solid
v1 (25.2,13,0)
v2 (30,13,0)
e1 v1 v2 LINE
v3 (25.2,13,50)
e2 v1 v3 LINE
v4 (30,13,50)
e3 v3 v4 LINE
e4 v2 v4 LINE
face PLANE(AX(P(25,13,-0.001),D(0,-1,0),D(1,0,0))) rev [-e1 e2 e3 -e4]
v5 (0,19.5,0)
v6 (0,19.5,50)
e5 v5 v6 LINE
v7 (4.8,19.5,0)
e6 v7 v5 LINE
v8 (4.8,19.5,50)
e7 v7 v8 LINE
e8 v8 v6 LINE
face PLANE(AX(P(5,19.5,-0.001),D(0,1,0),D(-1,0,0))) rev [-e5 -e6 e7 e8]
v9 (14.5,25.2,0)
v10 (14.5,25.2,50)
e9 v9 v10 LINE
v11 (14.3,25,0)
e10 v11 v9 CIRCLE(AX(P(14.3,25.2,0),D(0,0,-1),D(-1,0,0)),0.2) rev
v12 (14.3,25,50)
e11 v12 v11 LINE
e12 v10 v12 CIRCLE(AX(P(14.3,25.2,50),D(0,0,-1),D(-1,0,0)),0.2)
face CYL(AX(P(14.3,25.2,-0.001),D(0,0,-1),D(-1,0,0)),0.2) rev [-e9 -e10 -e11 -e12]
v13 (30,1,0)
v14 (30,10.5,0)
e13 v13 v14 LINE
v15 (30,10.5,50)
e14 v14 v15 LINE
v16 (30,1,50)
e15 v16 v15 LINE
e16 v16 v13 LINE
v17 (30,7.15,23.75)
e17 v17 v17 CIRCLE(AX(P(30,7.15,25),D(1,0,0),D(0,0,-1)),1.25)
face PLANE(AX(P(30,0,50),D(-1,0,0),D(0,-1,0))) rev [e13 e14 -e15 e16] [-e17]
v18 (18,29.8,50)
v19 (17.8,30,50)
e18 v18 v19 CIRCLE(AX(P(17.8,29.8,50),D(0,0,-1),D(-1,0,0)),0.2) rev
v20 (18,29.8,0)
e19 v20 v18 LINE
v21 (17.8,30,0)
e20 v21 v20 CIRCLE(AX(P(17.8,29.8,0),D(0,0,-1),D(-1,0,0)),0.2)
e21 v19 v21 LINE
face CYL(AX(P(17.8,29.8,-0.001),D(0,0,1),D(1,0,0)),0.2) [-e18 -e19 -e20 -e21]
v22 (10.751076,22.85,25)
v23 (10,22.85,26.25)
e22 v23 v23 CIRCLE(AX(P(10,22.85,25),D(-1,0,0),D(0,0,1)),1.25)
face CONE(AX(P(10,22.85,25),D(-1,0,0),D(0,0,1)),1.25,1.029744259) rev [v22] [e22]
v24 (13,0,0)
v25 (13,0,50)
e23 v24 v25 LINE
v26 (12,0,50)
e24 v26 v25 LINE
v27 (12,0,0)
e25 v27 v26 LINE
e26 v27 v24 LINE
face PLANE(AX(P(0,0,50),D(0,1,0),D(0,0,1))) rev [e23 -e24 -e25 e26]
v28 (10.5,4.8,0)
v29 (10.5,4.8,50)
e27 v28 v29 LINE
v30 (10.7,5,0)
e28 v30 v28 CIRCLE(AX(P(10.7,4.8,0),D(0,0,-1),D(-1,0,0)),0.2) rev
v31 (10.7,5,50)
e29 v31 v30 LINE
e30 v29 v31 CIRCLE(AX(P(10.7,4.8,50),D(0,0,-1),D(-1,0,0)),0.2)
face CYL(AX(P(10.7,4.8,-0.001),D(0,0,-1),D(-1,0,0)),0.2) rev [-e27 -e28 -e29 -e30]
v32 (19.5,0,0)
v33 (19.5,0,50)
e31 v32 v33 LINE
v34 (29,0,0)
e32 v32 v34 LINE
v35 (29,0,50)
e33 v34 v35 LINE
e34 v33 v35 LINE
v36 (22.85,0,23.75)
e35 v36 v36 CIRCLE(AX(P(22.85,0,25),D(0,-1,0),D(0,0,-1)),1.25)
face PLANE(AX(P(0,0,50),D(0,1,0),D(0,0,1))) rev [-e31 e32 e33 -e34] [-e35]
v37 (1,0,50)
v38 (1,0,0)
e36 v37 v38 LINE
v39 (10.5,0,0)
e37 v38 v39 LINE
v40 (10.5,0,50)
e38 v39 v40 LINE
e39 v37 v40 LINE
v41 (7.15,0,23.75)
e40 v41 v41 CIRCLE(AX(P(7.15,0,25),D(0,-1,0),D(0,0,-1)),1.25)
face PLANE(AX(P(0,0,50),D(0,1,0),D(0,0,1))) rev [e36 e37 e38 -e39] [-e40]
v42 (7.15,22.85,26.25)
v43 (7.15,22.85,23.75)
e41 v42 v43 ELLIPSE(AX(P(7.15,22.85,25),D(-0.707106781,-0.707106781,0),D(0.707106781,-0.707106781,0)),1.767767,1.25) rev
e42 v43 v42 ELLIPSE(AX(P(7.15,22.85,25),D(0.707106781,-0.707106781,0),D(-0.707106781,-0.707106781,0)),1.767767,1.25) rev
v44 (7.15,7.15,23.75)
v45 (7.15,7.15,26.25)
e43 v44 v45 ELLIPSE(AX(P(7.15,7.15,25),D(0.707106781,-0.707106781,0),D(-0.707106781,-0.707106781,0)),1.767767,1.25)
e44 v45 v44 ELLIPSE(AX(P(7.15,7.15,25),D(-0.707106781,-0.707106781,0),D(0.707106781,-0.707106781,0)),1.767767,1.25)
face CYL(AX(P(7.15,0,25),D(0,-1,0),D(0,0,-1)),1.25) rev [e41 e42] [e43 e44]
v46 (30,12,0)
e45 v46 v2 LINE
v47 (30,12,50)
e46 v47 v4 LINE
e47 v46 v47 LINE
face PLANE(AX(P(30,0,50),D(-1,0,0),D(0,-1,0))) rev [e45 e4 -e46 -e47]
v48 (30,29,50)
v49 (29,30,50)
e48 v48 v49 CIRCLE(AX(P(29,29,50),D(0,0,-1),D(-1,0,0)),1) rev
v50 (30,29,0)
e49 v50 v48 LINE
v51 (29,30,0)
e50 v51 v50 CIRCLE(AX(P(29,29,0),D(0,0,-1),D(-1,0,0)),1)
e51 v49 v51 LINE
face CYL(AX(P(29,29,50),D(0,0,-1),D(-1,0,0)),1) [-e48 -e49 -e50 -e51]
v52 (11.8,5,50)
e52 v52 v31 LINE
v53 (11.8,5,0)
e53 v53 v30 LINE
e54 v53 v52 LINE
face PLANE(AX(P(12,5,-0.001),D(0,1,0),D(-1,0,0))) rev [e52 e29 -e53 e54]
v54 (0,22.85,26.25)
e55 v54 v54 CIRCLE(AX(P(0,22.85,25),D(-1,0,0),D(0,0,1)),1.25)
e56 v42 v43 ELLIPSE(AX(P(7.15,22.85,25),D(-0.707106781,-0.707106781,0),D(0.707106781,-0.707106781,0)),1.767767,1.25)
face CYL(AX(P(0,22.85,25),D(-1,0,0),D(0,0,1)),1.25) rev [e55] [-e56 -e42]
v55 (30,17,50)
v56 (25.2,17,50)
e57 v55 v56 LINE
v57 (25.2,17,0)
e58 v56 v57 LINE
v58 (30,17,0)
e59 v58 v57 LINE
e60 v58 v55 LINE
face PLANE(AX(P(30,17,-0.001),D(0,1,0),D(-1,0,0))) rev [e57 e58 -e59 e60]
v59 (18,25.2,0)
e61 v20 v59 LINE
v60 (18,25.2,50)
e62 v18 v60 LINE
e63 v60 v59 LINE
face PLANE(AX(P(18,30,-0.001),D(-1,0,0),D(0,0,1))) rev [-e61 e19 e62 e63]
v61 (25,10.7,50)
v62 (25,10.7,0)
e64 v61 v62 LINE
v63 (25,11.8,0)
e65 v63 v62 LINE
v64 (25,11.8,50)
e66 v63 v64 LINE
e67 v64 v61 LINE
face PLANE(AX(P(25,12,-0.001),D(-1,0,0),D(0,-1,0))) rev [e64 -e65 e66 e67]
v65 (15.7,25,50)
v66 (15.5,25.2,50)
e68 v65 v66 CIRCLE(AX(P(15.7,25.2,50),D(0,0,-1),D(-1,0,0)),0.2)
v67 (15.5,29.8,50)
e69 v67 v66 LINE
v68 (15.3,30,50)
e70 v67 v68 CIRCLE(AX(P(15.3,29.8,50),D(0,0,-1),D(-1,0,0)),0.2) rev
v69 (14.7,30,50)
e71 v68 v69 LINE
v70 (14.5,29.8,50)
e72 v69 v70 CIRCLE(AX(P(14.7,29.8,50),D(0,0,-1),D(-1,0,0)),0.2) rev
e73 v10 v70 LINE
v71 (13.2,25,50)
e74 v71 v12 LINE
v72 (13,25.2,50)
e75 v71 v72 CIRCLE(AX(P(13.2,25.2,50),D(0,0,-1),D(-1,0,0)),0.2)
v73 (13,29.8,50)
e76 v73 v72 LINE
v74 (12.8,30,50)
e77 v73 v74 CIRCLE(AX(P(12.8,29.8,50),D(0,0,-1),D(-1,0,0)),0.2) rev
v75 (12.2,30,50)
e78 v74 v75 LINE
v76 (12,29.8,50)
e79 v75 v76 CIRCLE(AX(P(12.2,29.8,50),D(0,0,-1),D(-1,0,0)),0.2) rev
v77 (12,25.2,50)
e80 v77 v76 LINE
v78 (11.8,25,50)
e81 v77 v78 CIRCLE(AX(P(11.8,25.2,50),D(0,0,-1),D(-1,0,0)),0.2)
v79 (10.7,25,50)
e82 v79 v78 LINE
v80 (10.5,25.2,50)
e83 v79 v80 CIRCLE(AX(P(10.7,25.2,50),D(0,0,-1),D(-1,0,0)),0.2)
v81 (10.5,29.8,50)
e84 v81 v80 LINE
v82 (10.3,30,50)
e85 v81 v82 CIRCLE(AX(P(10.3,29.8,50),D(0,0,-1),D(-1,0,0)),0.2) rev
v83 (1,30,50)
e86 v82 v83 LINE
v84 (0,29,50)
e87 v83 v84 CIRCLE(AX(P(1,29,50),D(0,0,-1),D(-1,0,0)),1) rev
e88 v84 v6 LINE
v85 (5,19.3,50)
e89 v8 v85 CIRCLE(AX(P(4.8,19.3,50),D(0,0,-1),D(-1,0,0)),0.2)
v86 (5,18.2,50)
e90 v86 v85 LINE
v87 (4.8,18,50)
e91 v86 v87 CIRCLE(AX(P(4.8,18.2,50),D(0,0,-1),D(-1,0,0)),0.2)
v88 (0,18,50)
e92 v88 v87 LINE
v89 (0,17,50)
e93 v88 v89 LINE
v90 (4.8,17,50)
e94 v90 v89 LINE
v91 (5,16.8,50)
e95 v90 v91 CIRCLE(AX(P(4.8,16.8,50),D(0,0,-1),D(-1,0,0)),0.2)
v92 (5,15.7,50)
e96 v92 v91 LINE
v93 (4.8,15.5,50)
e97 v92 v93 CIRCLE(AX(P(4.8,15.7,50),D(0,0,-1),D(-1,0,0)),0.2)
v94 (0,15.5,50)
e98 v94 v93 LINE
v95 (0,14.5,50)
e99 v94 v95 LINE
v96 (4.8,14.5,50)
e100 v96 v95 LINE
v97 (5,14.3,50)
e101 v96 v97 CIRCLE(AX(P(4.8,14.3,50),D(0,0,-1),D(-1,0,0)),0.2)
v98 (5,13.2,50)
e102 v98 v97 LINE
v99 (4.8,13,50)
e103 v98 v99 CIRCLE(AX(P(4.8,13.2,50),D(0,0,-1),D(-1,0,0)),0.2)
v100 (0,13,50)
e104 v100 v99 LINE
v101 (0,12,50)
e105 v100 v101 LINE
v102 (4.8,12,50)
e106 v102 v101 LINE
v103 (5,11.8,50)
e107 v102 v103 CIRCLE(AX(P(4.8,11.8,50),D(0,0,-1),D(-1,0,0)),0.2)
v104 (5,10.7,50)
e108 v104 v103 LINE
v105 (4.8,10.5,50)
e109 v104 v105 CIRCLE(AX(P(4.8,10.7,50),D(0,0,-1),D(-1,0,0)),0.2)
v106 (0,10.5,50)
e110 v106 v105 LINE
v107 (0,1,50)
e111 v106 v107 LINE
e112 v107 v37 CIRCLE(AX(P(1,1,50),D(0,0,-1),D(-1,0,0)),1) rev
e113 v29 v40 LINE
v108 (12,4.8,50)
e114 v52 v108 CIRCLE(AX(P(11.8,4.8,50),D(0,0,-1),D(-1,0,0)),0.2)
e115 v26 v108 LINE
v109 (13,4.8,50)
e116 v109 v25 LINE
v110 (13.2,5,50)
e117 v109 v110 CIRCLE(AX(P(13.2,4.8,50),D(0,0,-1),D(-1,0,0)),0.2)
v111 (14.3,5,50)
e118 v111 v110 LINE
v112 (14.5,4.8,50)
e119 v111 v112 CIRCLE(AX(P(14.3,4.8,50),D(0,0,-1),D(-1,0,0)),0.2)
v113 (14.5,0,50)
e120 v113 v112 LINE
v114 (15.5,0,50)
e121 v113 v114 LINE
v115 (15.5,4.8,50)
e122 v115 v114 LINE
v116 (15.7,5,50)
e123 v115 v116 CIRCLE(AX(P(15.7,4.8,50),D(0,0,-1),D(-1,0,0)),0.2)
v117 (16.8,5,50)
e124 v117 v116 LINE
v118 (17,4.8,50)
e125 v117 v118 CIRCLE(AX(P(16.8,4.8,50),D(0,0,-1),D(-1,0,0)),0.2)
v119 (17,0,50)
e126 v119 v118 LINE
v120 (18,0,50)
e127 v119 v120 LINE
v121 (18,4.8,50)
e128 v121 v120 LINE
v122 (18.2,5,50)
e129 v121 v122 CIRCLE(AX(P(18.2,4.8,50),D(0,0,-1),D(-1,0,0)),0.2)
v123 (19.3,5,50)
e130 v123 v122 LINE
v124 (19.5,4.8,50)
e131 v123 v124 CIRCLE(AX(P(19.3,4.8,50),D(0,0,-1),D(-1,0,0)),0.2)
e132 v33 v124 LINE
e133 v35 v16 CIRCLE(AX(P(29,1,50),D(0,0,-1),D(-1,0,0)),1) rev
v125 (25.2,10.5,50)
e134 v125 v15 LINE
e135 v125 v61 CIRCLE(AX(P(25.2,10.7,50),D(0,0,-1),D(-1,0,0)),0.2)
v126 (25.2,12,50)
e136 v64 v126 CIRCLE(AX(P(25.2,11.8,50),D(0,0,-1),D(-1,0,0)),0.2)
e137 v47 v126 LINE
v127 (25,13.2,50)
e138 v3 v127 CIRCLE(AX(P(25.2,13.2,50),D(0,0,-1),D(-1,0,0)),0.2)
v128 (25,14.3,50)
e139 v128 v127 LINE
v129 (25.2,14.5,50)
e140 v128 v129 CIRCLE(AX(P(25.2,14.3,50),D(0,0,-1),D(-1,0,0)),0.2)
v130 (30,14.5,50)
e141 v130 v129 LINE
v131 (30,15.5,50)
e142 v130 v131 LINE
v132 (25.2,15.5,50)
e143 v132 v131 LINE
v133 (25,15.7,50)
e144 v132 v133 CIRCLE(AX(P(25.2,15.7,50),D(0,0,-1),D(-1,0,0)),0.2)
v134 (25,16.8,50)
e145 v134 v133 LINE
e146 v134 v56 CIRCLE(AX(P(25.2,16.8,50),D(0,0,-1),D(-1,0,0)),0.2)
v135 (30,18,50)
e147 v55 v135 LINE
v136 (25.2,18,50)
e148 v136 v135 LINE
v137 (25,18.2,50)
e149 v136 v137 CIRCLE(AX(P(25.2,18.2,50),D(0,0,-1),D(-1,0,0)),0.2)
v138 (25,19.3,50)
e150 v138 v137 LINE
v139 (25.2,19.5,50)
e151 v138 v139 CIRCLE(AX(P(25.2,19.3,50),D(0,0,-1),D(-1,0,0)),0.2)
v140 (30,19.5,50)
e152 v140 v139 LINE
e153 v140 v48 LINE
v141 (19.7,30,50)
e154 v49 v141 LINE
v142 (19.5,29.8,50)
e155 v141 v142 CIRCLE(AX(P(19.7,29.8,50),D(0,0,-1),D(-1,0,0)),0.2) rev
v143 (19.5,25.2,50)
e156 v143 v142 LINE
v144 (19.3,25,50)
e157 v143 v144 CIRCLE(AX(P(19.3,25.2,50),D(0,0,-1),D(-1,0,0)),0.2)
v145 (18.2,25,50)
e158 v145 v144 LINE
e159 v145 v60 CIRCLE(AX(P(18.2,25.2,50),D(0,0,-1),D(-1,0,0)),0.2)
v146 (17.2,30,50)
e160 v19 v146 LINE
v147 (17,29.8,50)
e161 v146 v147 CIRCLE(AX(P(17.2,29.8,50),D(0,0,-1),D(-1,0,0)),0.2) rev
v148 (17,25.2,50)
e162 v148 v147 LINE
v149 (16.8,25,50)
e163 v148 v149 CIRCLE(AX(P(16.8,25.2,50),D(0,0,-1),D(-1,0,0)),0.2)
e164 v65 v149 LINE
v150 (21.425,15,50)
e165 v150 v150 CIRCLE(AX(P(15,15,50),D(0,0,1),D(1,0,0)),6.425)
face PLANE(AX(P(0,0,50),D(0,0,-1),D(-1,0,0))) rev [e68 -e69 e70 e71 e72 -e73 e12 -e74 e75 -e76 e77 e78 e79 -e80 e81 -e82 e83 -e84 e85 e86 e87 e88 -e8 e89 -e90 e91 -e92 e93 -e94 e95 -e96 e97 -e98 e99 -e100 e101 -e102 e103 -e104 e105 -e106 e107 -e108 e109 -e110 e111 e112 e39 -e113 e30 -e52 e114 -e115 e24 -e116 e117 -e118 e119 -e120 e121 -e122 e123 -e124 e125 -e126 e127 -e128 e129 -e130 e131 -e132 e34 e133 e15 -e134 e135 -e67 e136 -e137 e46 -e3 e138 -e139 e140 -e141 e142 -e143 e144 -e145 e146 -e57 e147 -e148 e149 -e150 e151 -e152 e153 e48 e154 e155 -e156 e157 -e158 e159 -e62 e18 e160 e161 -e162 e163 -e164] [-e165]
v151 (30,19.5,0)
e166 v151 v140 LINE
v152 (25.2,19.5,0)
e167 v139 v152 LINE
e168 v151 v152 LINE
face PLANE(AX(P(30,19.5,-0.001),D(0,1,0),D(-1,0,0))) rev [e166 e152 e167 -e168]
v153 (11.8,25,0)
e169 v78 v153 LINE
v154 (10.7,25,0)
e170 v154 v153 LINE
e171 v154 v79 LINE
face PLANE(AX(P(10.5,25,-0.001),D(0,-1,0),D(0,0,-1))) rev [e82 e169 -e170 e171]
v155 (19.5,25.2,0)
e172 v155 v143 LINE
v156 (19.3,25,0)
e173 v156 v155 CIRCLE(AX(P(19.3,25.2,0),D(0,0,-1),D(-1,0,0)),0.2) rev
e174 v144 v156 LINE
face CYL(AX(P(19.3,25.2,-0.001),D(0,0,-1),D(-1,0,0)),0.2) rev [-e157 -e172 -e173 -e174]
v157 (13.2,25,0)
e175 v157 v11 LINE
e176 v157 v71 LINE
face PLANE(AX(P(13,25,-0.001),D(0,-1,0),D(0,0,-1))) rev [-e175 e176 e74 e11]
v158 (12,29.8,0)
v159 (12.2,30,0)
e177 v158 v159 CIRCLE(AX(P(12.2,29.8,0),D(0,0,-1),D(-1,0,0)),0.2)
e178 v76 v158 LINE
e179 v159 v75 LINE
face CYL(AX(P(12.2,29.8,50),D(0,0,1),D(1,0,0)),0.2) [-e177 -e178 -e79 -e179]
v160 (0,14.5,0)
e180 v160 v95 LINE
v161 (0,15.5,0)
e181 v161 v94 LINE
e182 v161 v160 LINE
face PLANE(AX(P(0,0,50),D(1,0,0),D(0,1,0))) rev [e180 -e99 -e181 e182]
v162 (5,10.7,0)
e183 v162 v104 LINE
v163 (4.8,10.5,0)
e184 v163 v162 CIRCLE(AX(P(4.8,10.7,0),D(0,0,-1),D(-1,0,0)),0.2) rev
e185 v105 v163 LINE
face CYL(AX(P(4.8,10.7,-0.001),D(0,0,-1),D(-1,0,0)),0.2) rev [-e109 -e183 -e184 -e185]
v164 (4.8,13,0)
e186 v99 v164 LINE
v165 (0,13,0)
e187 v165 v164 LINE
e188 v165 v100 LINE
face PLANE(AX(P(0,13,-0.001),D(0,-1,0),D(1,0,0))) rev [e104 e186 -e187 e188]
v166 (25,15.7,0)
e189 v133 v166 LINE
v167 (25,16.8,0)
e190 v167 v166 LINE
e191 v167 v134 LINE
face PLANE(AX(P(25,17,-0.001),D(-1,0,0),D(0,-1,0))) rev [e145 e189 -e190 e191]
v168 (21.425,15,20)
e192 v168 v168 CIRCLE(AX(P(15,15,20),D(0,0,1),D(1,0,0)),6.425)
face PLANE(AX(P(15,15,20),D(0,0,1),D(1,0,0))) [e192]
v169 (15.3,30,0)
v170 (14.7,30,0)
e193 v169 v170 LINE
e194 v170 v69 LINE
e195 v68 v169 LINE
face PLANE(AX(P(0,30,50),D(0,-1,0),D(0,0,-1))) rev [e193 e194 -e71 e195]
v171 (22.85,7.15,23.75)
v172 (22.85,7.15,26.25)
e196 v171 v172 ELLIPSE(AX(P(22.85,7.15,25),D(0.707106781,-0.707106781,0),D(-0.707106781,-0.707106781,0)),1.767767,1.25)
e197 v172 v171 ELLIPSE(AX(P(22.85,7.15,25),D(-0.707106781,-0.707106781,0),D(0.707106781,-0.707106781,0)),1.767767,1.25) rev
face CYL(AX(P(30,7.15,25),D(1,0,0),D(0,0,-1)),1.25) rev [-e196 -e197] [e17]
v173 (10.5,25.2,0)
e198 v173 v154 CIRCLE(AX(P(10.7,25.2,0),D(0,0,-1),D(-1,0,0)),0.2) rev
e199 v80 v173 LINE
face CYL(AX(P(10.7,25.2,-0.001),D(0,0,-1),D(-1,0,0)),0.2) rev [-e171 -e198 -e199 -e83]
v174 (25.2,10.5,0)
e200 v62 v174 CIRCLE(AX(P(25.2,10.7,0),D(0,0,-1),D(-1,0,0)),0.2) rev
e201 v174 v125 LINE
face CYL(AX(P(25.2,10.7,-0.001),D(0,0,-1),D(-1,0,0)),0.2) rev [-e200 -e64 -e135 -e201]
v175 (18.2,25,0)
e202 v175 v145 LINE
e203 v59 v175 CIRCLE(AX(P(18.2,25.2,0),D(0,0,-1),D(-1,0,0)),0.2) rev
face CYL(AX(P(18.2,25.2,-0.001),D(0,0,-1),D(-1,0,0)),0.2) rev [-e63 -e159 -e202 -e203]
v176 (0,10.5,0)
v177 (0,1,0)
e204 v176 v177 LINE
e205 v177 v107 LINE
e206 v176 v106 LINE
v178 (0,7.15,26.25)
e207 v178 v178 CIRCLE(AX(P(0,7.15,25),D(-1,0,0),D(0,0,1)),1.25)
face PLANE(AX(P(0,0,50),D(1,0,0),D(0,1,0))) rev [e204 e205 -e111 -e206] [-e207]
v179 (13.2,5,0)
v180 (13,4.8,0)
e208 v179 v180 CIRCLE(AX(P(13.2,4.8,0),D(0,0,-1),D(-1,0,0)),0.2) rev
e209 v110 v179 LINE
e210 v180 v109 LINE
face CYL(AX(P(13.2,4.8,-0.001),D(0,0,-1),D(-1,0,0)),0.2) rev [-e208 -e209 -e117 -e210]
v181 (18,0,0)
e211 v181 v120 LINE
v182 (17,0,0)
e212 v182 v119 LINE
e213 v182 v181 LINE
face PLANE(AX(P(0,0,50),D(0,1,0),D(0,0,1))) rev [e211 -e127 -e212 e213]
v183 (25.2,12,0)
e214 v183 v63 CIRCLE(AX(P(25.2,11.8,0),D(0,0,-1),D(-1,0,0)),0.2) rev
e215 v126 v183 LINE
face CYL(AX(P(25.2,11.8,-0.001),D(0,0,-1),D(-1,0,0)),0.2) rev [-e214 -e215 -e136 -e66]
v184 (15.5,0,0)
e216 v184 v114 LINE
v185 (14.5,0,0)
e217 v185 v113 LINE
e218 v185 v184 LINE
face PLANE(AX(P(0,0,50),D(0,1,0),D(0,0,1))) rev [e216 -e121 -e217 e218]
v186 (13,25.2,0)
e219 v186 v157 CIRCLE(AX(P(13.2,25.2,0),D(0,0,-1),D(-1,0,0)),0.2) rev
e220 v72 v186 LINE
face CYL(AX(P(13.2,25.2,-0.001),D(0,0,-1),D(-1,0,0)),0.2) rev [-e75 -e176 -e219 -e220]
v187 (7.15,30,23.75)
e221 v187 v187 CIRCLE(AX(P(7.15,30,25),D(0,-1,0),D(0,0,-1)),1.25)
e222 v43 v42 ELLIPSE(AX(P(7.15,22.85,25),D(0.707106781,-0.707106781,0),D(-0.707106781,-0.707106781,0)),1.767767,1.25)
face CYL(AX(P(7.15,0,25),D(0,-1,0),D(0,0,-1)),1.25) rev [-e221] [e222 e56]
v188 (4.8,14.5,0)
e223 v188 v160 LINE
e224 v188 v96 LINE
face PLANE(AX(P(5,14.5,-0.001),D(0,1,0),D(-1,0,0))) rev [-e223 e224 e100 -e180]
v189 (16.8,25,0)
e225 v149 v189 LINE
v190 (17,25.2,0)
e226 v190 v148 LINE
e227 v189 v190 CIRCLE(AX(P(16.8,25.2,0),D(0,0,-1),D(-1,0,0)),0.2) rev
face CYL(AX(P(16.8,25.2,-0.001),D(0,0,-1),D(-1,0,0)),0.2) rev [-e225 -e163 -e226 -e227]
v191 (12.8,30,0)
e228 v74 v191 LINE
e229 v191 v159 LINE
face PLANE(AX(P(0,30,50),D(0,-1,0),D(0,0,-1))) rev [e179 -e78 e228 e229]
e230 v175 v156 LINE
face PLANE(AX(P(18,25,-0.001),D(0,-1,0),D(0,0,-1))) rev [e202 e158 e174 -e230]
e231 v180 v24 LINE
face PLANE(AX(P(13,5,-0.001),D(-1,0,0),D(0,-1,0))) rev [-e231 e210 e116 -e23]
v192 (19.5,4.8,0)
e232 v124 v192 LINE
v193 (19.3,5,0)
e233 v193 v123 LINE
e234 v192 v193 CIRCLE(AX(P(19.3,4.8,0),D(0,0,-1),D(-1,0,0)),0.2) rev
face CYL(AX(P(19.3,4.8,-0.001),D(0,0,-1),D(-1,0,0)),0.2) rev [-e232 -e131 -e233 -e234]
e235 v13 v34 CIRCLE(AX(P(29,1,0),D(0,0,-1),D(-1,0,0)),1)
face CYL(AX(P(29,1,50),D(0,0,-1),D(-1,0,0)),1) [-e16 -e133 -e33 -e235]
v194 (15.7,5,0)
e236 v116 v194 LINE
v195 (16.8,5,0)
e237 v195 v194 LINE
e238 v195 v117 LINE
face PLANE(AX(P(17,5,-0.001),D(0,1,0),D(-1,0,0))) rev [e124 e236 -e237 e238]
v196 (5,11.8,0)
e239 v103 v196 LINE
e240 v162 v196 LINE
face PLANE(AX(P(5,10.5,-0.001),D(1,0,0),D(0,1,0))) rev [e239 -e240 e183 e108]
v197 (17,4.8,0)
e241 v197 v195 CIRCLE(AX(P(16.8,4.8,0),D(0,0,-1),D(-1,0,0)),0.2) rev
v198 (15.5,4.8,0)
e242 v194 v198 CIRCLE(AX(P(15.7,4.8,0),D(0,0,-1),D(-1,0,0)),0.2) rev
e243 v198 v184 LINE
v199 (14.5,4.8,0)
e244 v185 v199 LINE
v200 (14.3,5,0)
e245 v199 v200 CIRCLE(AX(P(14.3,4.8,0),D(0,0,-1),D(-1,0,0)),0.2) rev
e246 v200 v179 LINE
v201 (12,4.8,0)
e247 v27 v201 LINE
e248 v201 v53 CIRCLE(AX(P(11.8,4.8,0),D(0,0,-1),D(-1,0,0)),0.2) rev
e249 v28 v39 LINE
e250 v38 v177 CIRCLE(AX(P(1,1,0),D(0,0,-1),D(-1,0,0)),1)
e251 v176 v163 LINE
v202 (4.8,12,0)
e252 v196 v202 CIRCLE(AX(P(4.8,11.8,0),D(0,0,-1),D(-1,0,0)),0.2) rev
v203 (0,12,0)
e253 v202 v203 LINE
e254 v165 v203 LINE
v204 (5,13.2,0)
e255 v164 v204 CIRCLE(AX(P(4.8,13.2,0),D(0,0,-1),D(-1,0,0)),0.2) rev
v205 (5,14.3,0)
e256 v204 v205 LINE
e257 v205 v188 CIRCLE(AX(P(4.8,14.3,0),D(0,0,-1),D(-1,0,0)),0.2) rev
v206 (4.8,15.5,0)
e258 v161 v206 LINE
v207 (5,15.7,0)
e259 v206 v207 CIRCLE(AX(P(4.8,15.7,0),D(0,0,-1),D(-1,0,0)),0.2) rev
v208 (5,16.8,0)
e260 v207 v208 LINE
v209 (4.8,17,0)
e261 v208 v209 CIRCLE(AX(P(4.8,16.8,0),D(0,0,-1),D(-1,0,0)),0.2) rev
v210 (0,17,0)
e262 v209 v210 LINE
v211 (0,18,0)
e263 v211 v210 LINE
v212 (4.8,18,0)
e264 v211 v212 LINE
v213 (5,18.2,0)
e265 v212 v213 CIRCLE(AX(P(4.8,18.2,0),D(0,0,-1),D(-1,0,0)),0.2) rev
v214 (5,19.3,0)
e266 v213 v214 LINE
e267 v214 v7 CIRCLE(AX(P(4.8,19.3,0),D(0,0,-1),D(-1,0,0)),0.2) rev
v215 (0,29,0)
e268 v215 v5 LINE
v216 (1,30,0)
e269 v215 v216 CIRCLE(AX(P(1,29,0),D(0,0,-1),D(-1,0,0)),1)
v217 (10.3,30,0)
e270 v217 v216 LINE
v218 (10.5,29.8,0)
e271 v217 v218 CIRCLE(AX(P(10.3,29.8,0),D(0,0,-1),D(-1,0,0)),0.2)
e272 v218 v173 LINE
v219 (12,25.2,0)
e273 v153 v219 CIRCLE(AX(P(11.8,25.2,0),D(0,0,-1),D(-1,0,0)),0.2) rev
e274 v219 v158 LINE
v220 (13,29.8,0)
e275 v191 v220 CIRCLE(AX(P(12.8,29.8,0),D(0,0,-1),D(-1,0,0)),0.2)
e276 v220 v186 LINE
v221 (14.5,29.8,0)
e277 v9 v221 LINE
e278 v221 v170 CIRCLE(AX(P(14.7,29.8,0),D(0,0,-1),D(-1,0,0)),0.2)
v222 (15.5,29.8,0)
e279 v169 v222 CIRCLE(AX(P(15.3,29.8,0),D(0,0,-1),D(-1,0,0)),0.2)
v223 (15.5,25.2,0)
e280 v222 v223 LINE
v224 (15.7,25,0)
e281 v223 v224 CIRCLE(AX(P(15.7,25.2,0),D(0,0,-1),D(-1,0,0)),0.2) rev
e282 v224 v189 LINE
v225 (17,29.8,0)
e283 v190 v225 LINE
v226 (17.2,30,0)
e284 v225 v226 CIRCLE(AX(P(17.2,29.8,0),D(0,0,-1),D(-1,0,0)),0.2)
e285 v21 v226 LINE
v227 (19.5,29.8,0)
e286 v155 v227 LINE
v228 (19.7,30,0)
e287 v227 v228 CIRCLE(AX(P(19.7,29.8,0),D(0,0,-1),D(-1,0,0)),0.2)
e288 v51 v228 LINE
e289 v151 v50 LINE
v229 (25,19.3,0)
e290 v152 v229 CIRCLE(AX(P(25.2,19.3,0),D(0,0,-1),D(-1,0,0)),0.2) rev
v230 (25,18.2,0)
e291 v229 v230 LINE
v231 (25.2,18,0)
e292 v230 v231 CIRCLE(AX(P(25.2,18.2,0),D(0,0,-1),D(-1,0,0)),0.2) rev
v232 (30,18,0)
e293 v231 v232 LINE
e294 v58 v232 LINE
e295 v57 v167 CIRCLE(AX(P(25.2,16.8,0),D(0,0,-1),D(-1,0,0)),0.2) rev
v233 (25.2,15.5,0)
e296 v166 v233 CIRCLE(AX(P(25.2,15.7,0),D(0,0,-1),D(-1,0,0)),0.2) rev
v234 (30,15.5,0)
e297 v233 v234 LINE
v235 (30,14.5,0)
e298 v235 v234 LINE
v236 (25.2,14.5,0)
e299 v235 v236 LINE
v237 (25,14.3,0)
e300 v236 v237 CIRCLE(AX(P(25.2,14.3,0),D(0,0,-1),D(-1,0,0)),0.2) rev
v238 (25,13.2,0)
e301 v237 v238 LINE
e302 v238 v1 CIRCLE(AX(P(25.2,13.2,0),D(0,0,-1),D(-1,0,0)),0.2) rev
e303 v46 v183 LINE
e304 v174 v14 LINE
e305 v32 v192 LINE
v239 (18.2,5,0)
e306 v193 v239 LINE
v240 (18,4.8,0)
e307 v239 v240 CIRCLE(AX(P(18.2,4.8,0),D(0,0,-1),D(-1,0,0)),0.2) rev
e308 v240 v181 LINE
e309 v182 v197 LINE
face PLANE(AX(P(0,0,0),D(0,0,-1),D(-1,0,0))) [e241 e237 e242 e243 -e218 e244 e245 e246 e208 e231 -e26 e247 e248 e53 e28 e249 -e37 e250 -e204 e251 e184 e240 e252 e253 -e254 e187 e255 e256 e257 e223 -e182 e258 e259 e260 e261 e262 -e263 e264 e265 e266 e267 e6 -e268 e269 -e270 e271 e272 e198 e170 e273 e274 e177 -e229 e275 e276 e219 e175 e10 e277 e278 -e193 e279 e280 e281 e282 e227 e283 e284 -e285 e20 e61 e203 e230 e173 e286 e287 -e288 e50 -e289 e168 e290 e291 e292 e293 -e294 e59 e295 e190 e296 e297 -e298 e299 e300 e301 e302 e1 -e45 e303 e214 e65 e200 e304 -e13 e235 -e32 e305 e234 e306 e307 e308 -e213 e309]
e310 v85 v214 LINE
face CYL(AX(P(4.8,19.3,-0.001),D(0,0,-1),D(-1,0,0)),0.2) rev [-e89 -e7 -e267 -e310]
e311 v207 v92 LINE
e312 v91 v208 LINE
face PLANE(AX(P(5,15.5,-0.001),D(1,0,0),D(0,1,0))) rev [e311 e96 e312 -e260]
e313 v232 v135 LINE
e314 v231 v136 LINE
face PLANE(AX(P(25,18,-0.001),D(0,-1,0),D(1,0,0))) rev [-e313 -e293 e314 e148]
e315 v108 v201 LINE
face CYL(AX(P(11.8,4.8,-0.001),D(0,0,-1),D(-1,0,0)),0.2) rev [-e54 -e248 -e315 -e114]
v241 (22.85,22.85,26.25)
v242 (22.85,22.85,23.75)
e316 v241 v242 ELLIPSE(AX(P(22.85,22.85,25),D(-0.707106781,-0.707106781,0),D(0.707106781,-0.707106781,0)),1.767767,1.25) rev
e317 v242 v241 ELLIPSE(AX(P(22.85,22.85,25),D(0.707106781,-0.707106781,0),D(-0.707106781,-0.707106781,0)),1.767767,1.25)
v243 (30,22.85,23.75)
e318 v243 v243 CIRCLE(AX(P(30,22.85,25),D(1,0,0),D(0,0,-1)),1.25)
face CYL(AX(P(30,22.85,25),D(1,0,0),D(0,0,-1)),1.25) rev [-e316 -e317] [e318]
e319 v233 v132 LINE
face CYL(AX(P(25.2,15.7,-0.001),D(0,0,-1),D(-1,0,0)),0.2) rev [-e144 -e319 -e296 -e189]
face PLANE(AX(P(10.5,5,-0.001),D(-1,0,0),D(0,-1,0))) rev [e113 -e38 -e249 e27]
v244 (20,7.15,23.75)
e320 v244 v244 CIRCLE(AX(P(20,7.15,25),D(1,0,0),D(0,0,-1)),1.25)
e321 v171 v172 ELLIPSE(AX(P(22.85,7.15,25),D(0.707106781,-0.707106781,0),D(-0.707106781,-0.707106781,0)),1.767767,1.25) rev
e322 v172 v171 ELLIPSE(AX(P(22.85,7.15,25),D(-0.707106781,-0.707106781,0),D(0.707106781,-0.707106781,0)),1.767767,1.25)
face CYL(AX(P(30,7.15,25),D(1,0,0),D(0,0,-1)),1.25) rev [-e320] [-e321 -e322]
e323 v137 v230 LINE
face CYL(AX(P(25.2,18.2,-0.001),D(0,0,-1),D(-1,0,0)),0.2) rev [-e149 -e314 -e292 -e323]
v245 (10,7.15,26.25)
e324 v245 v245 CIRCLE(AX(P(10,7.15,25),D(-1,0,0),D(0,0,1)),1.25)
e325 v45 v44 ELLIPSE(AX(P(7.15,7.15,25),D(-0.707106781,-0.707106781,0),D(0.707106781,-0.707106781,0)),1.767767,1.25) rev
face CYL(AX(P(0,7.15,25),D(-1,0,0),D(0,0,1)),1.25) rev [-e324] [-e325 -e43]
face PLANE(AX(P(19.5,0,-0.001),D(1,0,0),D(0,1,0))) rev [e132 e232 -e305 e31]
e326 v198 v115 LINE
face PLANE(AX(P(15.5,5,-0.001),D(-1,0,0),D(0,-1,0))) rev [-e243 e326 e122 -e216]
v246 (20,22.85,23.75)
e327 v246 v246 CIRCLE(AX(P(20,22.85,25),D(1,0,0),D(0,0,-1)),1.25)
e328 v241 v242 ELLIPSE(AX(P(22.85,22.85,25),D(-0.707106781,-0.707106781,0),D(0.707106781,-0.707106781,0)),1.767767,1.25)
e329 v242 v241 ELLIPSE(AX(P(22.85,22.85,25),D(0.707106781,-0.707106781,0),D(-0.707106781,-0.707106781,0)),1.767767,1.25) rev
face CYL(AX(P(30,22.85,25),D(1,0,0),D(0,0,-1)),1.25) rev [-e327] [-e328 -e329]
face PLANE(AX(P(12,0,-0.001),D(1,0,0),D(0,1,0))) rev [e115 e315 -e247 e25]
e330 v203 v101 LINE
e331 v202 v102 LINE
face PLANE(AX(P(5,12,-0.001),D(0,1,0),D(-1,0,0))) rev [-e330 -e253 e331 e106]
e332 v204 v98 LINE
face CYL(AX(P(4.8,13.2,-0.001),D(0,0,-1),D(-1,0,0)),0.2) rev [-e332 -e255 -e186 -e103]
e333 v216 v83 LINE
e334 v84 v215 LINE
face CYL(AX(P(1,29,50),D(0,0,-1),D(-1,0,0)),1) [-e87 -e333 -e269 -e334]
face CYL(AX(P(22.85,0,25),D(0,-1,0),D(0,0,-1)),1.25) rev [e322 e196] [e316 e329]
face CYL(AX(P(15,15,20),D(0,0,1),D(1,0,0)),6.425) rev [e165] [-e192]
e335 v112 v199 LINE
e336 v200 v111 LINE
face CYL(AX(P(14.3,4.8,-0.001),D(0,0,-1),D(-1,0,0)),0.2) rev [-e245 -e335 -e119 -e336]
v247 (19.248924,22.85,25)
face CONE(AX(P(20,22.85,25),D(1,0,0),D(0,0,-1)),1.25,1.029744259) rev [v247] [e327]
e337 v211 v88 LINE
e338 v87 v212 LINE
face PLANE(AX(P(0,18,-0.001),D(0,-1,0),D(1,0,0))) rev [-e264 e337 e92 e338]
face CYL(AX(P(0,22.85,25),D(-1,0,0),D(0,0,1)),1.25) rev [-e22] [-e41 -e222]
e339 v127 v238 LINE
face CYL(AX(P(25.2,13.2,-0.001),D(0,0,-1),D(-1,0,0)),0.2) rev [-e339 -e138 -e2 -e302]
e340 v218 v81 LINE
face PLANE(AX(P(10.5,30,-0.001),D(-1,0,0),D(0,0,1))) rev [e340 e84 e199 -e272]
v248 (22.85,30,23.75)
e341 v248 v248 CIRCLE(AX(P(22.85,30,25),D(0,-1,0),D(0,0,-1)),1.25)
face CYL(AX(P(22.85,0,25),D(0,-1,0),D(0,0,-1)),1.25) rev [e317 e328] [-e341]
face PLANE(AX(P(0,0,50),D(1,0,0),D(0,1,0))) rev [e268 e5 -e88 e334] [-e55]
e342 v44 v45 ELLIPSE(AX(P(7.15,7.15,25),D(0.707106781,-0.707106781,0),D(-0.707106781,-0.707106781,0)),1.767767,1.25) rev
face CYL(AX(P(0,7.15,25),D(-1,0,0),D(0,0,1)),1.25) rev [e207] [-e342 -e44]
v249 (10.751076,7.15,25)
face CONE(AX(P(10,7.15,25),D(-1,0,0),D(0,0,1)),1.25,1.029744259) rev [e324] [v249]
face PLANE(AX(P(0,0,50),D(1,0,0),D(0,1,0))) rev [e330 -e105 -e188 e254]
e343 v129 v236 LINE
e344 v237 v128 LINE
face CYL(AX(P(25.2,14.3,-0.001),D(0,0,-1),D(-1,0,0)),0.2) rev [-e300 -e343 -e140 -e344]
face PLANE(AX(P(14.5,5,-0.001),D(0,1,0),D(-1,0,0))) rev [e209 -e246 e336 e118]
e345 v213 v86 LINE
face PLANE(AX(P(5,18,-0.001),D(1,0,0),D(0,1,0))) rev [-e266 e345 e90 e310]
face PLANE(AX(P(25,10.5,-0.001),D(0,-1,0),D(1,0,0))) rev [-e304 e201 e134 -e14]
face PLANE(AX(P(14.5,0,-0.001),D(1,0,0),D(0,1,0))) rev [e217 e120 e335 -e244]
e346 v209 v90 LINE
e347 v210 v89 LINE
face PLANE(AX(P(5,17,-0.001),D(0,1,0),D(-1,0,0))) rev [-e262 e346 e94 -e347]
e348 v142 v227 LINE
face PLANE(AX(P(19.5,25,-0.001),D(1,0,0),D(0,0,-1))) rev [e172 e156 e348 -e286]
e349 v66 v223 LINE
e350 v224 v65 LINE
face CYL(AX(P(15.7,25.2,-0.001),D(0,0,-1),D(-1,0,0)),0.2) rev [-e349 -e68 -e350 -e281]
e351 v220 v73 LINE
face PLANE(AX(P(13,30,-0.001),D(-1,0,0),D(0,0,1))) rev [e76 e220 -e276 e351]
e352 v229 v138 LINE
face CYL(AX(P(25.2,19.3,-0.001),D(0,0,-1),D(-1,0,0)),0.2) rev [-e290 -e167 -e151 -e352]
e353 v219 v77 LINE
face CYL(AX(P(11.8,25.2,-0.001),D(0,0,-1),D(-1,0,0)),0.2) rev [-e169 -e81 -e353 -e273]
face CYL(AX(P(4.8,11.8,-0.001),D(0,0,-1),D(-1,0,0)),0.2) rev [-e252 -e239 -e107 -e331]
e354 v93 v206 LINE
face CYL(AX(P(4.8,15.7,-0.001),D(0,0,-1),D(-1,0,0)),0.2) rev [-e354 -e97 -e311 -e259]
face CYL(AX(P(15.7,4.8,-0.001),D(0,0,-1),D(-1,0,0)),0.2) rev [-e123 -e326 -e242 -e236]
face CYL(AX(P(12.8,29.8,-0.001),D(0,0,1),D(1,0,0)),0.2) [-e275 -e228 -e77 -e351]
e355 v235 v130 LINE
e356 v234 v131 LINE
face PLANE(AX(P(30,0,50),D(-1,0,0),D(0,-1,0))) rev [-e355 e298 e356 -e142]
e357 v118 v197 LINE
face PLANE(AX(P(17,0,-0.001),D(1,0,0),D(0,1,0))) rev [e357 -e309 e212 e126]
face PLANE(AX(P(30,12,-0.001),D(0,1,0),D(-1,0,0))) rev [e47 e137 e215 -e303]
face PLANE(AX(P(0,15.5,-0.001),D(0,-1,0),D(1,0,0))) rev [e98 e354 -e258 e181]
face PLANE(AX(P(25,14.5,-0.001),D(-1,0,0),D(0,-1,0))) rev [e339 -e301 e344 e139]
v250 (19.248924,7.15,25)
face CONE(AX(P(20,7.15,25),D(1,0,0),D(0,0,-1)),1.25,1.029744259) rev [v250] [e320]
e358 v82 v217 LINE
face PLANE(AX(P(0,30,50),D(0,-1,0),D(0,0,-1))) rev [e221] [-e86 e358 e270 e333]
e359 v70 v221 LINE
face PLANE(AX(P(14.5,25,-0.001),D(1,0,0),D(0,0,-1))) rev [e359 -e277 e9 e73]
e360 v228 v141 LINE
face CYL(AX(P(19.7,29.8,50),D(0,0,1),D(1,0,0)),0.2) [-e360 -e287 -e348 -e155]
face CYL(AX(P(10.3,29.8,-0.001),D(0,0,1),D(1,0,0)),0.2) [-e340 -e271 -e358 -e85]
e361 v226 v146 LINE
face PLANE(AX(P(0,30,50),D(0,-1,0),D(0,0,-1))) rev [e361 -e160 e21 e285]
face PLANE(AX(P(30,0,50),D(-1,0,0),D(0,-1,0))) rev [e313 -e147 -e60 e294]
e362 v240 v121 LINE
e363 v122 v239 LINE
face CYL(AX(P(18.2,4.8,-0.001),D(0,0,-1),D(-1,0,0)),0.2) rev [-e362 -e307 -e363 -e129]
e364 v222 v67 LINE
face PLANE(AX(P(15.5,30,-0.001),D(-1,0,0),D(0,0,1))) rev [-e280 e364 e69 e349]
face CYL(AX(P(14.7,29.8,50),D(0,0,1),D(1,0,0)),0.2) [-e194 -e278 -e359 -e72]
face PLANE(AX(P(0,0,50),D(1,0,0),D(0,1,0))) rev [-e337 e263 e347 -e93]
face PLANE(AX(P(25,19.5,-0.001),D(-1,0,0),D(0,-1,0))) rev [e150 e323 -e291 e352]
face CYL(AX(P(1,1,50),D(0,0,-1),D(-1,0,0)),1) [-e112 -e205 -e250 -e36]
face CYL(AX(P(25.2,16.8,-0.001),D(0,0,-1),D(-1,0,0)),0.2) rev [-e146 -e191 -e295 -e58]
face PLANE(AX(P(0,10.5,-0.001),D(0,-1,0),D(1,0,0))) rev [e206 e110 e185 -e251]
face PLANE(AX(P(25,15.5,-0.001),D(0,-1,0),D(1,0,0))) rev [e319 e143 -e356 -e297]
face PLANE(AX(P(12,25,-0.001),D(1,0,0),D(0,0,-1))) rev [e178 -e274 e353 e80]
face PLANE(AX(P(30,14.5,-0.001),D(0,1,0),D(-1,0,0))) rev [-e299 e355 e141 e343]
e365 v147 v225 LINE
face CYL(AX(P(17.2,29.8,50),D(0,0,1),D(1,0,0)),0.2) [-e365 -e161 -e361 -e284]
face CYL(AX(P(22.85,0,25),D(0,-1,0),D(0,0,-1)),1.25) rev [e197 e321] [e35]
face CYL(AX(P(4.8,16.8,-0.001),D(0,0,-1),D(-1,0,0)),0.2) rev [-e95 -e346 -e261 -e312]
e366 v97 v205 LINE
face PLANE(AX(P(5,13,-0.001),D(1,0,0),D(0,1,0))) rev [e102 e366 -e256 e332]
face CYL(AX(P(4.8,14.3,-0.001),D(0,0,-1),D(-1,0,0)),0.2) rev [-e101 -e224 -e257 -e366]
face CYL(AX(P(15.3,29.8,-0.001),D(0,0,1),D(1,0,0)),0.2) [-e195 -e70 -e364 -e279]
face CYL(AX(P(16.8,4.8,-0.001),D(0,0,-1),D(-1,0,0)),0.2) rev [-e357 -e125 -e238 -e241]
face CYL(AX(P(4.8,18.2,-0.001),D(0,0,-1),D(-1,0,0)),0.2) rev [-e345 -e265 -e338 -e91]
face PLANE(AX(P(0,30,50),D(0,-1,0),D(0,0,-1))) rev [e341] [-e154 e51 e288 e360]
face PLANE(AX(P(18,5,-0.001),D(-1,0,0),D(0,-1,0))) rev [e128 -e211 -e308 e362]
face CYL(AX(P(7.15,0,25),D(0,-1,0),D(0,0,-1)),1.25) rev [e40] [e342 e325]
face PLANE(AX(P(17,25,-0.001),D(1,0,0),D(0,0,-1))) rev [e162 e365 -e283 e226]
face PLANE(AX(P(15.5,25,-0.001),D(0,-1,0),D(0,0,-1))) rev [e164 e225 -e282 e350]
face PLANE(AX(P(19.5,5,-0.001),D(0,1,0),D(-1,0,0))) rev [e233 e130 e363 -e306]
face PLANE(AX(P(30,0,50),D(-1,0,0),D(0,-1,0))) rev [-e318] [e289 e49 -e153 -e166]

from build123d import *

# Parameters (mm, degrees)
SKETCH1_W                        = 30
SKETCH1_H                        = 30
BOSS_EXTRUDE1_DEPTH              = 50
FILLET1_R                        = 1
CUT_EXTRUDE2_START               = -30
CUT_EXTRUDE2_OUTLINE_R           = 6.425
CUT_EXTRUDE2_DEPTH               = 30
TAP_DRILL_FOR_M3_TAP1_D          = 2.5
TAP_DRILL_FOR_M3_TAP2_AT_2_COUNT = 2
TAP_DRILL_FOR_M3_TAP2_AT_2_PITCH = 15.7
CUT_EXTRUDE5_REACH               = 67.574
SKETCH6_W                        = 1.5
SKETCH6_H                        = 5
FILLET2_R                        = 0.2
CIRPATTERN1_DEPTH                = 50
CIRPATTERN1_2_OUTLINE_R          = 1.25
CIRPATTERN1_2_DEPTH              = 7.1500001
CIRPATTERN1_START                = 22.8499999
CIRPATTERN1_3_OUTLINE_R          = 1.25
CIRPATTERN1_3_DEPTH              = 7.1500001


# Read off the part's stored shape, not the designer's step: Cut-Extrude2, CirPattern1
with BuildPart() as part:
    # Sketch1 → Boss-Extrude1 (new body)
    with BuildSketch(Plane.XY):
        with Locations((15, 15)):
            Rectangle(SKETCH1_W, SKETCH1_H)
    extrude(amount=BOSS_EXTRUDE1_DEPTH)

    # Fillet1
    fillet1_edges = [part.edges().sort_by_distance(p)[0] for p in [
        (0, 30, 25),
        (30, 30, 25),
        (30, 0, 25),
        (0, 0, 25),
    ]]
    fillet(fillet1_edges, radius=FILLET1_R)

    # Cut-Extrude2 outline → Cut-Extrude2 (cut)
    with BuildSketch(Plane.XY.offset(50).offset(CUT_EXTRUDE2_START)):
        with Locations((15, 15)):
            Circle(CUT_EXTRUDE2_OUTLINE_R)
    extrude(amount=CUT_EXTRUDE2_DEPTH, mode=Mode.SUBTRACT)

    # Tap Drill for M3 Tap1 (through all)
    with Locations(Plane(origin=(0, 0, 0), x_dir=(-1, 0, 0), z_dir=(0, -1, 0))):
        with Locations((-7.15, -25), (-22.85, -25)):
            Hole(TAP_DRILL_FOR_M3_TAP1_D / 2)

    # Sketch8 → Tap Drill for M3 Tap2 (revolve, cut)
    with BuildSketch(Plane(origin=(7.15, 0, 25), x_dir=(0, 0, -1), z_dir=(1, 0, 0))):
        Polygon((0, 0), (0, 10.751075774), (1.25, 10), (1.25, 0), align=None)
    tap_drill_for_m3_tap2 = revolve(axis=Axis((7.15, -6.35, 25), (0, 1, 0)), mode=Mode.SUBTRACT)

    # Tap Drill for M3 Tap2 at 2: Tap Drill for M3 Tap2 ×2
    with Locations(*[(i * TAP_DRILL_FOR_M3_TAP2_AT_2_PITCH, 0, 0) for i in range(1, TAP_DRILL_FOR_M3_TAP2_AT_2_COUNT)]):
        add(tap_drill_for_m3_tap2, mode=Mode.SUBTRACT)

    # Sketch6 → Cut-Extrude5 (cut, up to next)
    with BuildSketch(Plane.XY.offset(50), mode=Mode.PRIVATE) as cut_extrude5_sk1:
        with Locations((11.25, 27.5)):
            Rectangle(SKETCH6_W, SKETCH6_H)
    cut_extrude5_tool1 = extrude(cut_extrude5_sk1.sketch, amount=-CUT_EXTRUDE5_REACH, mode=Mode.PRIVATE) & part.part
    # Sketch6 → Cut-Extrude5 (cut, up to next)
    with BuildSketch(Plane.XY.offset(50), mode=Mode.PRIVATE) as cut_extrude5_sk2:
        with Locations((18.75, 27.5)):
            Rectangle(SKETCH6_W, SKETCH6_H)
    cut_extrude5_tool2 = extrude(cut_extrude5_sk2.sketch, amount=-CUT_EXTRUDE5_REACH, mode=Mode.PRIVATE) & part.part
    # Sketch6 → Cut-Extrude5 (cut, up to next)
    with BuildSketch(Plane.XY.offset(50), mode=Mode.PRIVATE) as cut_extrude5_sk3:
        with Locations((13.75, 27.5)):
            Rectangle(SKETCH6_W, SKETCH6_H)
    cut_extrude5_tool3 = extrude(cut_extrude5_sk3.sketch, amount=-CUT_EXTRUDE5_REACH, mode=Mode.PRIVATE) & part.part
    # Sketch6 → Cut-Extrude5 (cut, up to next)
    with BuildSketch(Plane.XY.offset(50), mode=Mode.PRIVATE) as cut_extrude5_sk4:
        with Locations((16.25, 27.5)):
            Rectangle(SKETCH6_W, SKETCH6_H)
    cut_extrude5_tool4 = extrude(cut_extrude5_sk4.sketch, amount=-CUT_EXTRUDE5_REACH, mode=Mode.PRIVATE) & part.part
    add(cut_extrude5_tool1.solids().sort_by_distance((11.25, 27.5, 50))[0], mode=Mode.SUBTRACT)
    add(cut_extrude5_tool2.solids().sort_by_distance((18.75, 27.5, 50))[0], mode=Mode.SUBTRACT)
    add(cut_extrude5_tool3.solids().sort_by_distance((13.75, 27.5, 50))[0], mode=Mode.SUBTRACT)
    add(cut_extrude5_tool4.solids().sort_by_distance((16.25, 27.5, 50))[0], mode=Mode.SUBTRACT)

    # Fillet2
    fillet2_edges = [part.edges().sort_by_distance(p)[0] for p in [
        (18, 25, 25),
        (18, 30, 25),
        (19.5, 30, 25),
        (19.5, 25, 25),
        (10.5, 30, 25),
        (12, 30, 25),
        (12, 25, 25),
        (10.5, 25, 25),
        (13, 30, 25),
        (14.5, 30, 25),
        (14.5, 25, 25),
        (13, 25, 25),
        (15.5, 30, 25),
        (17, 30, 25),
        (17, 25, 25),
        (15.5, 25, 25),
    ]]
    fillet(fillet2_edges, radius=FILLET2_R)

    # CirPattern1 outline → CirPattern1 (cut)
    with BuildSketch(Plane.XY):
        with BuildLine():
            Line((10.5, 0), (12, 0))
            Line((12, 0), (12, 4.8))
            ThreePointArc((12, 4.8), (11.941421356, 4.941421356), (11.8, 5))
            Line((11.8, 5), (10.7, 5))
            ThreePointArc((10.7, 5), (10.558578644, 4.941421356), (10.5, 4.8))
            Line((10.5, 4.8), (10.5, 0))
        make_face()
        with BuildLine():
            Line((18, 4.8), (18, 0))
            Line((18, 0), (19.5, 0))
            Line((19.5, 0), (19.5, 4.8))
            ThreePointArc((19.5, 4.8), (19.441421356, 4.941421356), (19.3, 5))
            Line((19.3, 5), (18.2, 5))
            ThreePointArc((18.2, 5), (18.058578644, 4.941421356), (18, 4.8))
        make_face()
        with BuildLine():
            Line((15.5, 4.8), (15.5, 0))
            Line((15.5, 0), (17, 0))
            Line((17, 0), (17, 4.8))
            ThreePointArc((17, 4.8), (16.941421356, 4.941421356), (16.8, 5))
            Line((16.8, 5), (15.7, 5))
            ThreePointArc((15.7, 5), (15.558578644, 4.941421356), (15.5, 4.8))
        make_face()
        with BuildLine():
            Line((13, 4.8), (13, 0))
            Line((13, 0), (14.5, 0))
            Line((14.5, 0), (14.5, 4.8))
            ThreePointArc((14.5, 4.8), (14.441421356, 4.941421356), (14.3, 5))
            Line((14.3, 5), (13.2, 5))
            ThreePointArc((13.2, 5), (13.058578644, 4.941421356), (13, 4.8))
        make_face()
        with BuildLine():
            ThreePointArc((5, 11.8), (4.941421356, 11.941421356), (4.8, 12))
            Line((4.8, 12), (0, 12))
            Line((0, 12), (0, 10.5))
            Line((0, 10.5), (4.8, 10.5))
            ThreePointArc((4.8, 10.5), (4.941421356, 10.558578644), (5, 10.7))
            Line((5, 10.7), (5, 11.8))
        make_face()
        with BuildLine():
            Line((0, 19.5), (0, 18))
            Line((0, 18), (4.8, 18))
            ThreePointArc((4.8, 18), (4.941421356, 18.058578644), (5, 18.2))
            Line((5, 18.2), (5, 19.3))
            ThreePointArc((5, 19.3), (4.941421356, 19.441421356), (4.8, 19.5))
            Line((4.8, 19.5), (0, 19.5))
        make_face()
        with BuildLine():
            Line((0, 17), (0, 15.5))
            Line((0, 15.5), (4.8, 15.5))
            ThreePointArc((4.8, 15.5), (4.941421356, 15.558578644), (5, 15.7))
            Line((5, 15.7), (5, 16.8))
            ThreePointArc((5, 16.8), (4.941421356, 16.941421356), (4.8, 17))
            Line((4.8, 17), (0, 17))
        make_face()
        with BuildLine():
            Line((0, 14.5), (0, 13))
            Line((0, 13), (4.8, 13))
            ThreePointArc((4.8, 13), (4.941421356, 13.058578644), (5, 13.2))
            Line((5, 13.2), (5, 14.3))
            ThreePointArc((5, 14.3), (4.941421356, 14.441421356), (4.8, 14.5))
            Line((4.8, 14.5), (0, 14.5))
        make_face()
        with BuildLine():
            Line((30, 10.5), (30, 12))
            Line((30, 12), (25.2, 12))
            ThreePointArc((25.2, 12), (25.058578644, 11.941421356), (25, 11.8))
            Line((25, 11.8), (25, 10.7))
            ThreePointArc((25, 10.7), (25.058578644, 10.558578644), (25.2, 10.5))
            Line((25.2, 10.5), (30, 10.5))
        make_face()
        with BuildLine():
            Line((25.2, 18), (30, 18))
            Line((30, 18), (30, 19.5))
            Line((30, 19.5), (25.2, 19.5))
            ThreePointArc((25.2, 19.5), (25.058578644, 19.441421356), (25, 19.3))
            Line((25, 19.3), (25, 18.2))
            ThreePointArc((25, 18.2), (25.058578644, 18.058578644), (25.2, 18))
        make_face()
        with BuildLine():
            Line((25.2, 15.5), (30, 15.5))
            Line((30, 15.5), (30, 17))
            Line((30, 17), (25.2, 17))
            ThreePointArc((25.2, 17), (25.058578644, 16.941421356), (25, 16.8))
            Line((25, 16.8), (25, 15.7))
            ThreePointArc((25, 15.7), (25.058578644, 15.558578644), (25.2, 15.5))
        make_face()
        with BuildLine():
            Line((25.2, 13), (30, 13))
            Line((30, 13), (30, 14.5))
            Line((30, 14.5), (25.2, 14.5))
            ThreePointArc((25.2, 14.5), (25.058578644, 14.441421356), (25, 14.3))
            Line((25, 14.3), (25, 13.2))
            ThreePointArc((25, 13.2), (25.058578644, 13.058578644), (25.2, 13))
        make_face()
    extrude(amount=CIRPATTERN1_DEPTH, mode=Mode.SUBTRACT)

    # CirPattern1 2 outline → CirPattern1 2 (cut)
    with BuildSketch(Plane.YZ):
        with Locations((22.85, 25)):
            Circle(CIRPATTERN1_2_OUTLINE_R)
        with Locations((7.15, 25)):
            Circle(CIRPATTERN1_2_OUTLINE_R)
    extrude(amount=CIRPATTERN1_2_DEPTH, mode=Mode.SUBTRACT)

    # CirPattern1 3 outline → CirPattern1 3 (cut)
    with BuildSketch(Plane.YZ.offset(CIRPATTERN1_START)):
        with Locations((22.85, 25)):
            Circle(CIRPATTERN1_3_OUTLINE_R)
        with Locations((7.15, 25)):
            Circle(CIRPATTERN1_3_OUTLINE_R)
    extrude(amount=CIRPATTERN1_3_DEPTH, mode=Mode.SUBTRACT)

    # CirPattern1 4 outline → CirPattern1 4 (revolve, cut)
    with BuildSketch(Plane(origin=(0, 22.85, 25), x_dir=(0, 1, 0), z_dir=(0, 0, -1))):
        Polygon((0, 19.248924226), (1.25, 20), (1.25, 22.85), (0, 22.85), align=None)
        Polygon((1.25, 10), (0, 10.751075774), (0, 7.15), (1.25, 7.15), align=None)
    revolve(axis=Axis((0, 22.85, 25), (1, 0, 0)), mode=Mode.SUBTRACT)

    # CirPattern1 5 outline → CirPattern1 5 (revolve, cut)
    with BuildSketch(Plane(origin=(0, 7.15, 25), x_dir=(0, 1, 0), z_dir=(0, 0, -1))):
        Polygon((0, 19.248924226), (1.25, 20), (1.25, 22.85), (0, 22.85), align=None)
        Polygon((1.25, 10), (0, 10.751075774), (0, 7.15), (1.25, 7.15), align=None)
    revolve(axis=Axis((0, 7.15, 25), (1, 0, 0)), mode=Mode.SUBTRACT)


solid = part.part
